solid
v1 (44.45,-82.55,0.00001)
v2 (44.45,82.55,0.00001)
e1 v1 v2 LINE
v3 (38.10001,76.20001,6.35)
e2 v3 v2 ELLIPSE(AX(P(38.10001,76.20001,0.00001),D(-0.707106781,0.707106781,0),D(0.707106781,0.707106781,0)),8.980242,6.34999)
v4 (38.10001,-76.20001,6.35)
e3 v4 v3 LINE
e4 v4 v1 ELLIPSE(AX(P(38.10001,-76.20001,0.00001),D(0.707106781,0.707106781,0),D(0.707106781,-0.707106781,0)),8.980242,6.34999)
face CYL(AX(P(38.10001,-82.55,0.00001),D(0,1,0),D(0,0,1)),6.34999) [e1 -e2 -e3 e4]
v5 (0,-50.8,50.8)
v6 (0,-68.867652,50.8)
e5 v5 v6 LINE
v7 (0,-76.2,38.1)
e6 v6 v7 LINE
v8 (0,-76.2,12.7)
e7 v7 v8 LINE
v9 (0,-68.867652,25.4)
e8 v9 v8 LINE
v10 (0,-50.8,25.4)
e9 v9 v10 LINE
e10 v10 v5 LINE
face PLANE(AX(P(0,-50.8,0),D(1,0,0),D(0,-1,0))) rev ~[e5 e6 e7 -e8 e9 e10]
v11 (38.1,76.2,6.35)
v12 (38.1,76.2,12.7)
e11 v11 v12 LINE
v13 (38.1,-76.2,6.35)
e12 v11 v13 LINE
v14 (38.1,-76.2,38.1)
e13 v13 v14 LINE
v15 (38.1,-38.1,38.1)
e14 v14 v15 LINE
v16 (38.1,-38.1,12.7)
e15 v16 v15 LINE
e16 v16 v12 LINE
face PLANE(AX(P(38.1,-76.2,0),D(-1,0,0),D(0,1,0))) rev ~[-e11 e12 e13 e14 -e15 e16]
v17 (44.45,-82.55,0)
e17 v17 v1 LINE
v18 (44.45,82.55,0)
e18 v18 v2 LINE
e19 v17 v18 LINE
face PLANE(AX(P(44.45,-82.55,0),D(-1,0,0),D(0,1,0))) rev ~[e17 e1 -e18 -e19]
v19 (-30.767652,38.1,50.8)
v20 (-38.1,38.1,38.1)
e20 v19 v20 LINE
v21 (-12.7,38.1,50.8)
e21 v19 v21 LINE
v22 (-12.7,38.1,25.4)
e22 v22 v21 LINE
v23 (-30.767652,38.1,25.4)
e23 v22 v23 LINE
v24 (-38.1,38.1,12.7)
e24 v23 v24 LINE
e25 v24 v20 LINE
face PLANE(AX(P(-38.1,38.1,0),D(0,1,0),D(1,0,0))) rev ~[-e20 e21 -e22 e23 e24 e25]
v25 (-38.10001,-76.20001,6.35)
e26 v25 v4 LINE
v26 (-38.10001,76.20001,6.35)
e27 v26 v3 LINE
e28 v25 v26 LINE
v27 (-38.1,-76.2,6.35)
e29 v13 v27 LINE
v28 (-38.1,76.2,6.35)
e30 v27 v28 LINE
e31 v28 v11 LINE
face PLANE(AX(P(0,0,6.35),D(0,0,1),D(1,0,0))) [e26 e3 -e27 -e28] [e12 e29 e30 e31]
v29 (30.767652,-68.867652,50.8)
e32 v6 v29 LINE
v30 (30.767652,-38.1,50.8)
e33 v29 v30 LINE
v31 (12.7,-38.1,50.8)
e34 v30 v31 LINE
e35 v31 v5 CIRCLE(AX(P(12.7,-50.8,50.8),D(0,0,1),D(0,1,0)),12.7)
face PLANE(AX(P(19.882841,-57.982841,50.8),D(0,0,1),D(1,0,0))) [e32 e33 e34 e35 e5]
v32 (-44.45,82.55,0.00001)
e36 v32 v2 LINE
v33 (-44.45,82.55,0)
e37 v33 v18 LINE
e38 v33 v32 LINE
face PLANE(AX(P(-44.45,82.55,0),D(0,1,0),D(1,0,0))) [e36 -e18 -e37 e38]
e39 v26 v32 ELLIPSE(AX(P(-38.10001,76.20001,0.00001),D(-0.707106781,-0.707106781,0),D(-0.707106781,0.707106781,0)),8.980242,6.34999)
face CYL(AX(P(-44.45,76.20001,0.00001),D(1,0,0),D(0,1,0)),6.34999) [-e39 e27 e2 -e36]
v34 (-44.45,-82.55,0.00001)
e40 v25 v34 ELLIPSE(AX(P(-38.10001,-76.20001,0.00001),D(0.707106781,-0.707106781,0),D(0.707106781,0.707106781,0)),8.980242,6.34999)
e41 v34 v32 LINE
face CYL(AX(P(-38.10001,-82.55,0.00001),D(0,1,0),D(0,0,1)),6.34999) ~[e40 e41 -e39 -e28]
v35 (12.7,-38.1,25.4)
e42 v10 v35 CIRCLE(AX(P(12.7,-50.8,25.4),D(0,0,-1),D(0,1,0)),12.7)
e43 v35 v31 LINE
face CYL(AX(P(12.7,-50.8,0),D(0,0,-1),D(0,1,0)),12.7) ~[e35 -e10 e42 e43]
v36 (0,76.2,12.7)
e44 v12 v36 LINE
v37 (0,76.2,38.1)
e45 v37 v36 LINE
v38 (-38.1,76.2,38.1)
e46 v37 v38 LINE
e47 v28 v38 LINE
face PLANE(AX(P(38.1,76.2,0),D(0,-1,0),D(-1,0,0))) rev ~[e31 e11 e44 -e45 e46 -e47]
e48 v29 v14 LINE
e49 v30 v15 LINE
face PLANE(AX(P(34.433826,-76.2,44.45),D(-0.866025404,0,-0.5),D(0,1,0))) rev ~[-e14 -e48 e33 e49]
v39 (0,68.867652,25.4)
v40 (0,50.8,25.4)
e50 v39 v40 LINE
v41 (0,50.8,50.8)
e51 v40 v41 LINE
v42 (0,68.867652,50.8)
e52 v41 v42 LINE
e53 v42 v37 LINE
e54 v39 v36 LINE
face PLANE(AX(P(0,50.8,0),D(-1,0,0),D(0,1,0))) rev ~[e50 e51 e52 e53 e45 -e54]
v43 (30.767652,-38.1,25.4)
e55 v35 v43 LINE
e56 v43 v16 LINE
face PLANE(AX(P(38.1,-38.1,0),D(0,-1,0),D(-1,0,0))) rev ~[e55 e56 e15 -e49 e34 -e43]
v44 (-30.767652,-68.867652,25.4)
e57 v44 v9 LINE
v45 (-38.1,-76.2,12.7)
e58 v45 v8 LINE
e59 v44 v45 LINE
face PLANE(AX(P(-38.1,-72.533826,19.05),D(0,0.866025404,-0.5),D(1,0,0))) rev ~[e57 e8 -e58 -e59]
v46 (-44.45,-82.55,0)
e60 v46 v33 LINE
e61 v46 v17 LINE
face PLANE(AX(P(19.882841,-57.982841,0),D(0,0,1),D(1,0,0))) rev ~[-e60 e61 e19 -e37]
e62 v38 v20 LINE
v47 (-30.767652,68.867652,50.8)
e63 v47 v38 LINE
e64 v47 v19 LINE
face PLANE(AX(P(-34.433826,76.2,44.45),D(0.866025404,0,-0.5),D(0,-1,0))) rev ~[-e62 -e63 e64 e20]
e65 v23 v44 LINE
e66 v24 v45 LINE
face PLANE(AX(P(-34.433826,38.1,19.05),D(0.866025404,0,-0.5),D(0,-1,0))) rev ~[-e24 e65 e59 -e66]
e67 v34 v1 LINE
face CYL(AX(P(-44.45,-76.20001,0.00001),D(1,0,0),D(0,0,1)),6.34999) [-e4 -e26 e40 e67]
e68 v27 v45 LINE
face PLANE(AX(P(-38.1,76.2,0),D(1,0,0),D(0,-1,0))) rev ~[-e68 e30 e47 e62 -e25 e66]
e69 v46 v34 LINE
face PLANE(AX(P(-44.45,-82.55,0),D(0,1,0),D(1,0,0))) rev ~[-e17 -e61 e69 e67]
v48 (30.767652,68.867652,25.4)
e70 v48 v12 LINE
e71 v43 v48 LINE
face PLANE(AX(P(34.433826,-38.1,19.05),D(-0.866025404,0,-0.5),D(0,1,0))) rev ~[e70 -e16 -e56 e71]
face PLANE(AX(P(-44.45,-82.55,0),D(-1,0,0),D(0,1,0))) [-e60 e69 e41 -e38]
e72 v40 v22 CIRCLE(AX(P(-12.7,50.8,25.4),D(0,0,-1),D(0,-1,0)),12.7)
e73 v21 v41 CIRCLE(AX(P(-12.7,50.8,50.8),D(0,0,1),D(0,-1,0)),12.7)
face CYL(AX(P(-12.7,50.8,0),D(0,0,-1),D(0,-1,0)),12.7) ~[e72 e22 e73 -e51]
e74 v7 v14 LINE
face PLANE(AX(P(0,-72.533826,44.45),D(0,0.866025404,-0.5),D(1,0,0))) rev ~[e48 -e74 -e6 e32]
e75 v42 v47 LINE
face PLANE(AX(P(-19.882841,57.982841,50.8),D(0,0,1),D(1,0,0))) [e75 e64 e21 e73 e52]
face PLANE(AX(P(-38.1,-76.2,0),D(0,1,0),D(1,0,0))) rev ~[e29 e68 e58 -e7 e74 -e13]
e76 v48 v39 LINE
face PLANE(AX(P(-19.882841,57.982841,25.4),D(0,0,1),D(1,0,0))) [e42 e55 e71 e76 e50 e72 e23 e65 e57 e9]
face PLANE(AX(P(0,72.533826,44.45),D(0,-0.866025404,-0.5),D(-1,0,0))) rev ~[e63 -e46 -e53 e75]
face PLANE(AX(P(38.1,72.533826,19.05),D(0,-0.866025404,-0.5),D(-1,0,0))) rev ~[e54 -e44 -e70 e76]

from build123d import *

# Parameters (mm, degrees)
F0_W     = 88.8999994576
F0_H     = 165.0999994576
F1_DEPTH = 6.35
F2_DEPTH = 25.4
F3_DEPTH = 50.8
F4_R     = 6.34999
F5_SIZE2 = 12.7
F5_SIZE  = 7.3323484187
F6_SIZE2 = 12.7
F6_SIZE  = 7.3323484187
F7_SIZE2 = 12.7
F7_SIZE  = 7.3323484187
F8_SIZE2 = 12.7
F8_SIZE  = 7.3323484187


# Not quite as in the source:
# - a fillet or chamfer is up to 0.001 mm smaller than in the source, because OpenCascade refuses the exact size


with BuildPart() as f1:
    # F0 (on Top) → F1 (new body)
    with BuildSketch(Plane.XY):
        with Locations((-2.712e-07, -2.712e-07)):
            Rectangle(F0_W, F0_H)
        Polygon((38.1, -38.1), (38.1, -76.2), (0, -76.2), (-38.1, -76.2), (-38.1, 38.1), (-38.1, 76.2), (0, 76.2), (38.1, 76.2), align=None, mode=Mode.SUBTRACT)
        with BuildLine():
            Line((-38.1, -76.2), (0, -76.2))
            Line((0, -76.2), (0, -50.8))
            ThreePointArc((0, -50.8), (3.7197438789, -41.8197438789), (12.7, -38.1))
            Line((12.7, -38.1), (38.1, -38.1))
            Line((38.1, -38.1), (38.1, 76.2))
            Line((38.1, 76.2), (0, 76.2))
            Line((0, 76.2), (0, 50.8))
            ThreePointArc((0, 50.8), (-3.7197438789, 41.8197438789), (-12.7, 38.1))
            Line((-12.7, 38.1), (-38.1, 38.1))
            Line((-38.1, 38.1), (-38.1, -76.2))
        make_face()
        with BuildLine():
            Line((0, -76.2), (38.1, -76.2))
            Line((38.1, -76.2), (38.1, -38.1))
            Line((38.1, -38.1), (12.7, -38.1))
            ThreePointArc((12.7, -38.1), (3.7197438789, -41.8197438789), (0, -50.8))
            Line((0, -50.8), (0, -76.2))
        make_face()
        with BuildLine():
            Line((-38.1, 76.2), (-38.1, 38.1))
            Line((-38.1, 38.1), (-12.7, 38.1))
            ThreePointArc((-12.7, 38.1), (-3.7197438789, 41.8197438789), (0, 50.8))
            Line((0, 50.8), (0, 76.2))
            Line((0, 76.2), (-38.1, 76.2))
        make_face()
    extrude(amount=F1_DEPTH)

    # F0 (on Top) → F2 (join)
    with BuildSketch(Plane.XY):
        with BuildLine():
            Line((-38.1, 76.2), (-38.1, 38.1))
            Line((-38.1, 38.1), (-12.7, 38.1))
            ThreePointArc((-12.7, 38.1), (-3.7197438789, 41.8197438789), (0, 50.8))
            Line((0, 50.8), (0, 76.2))
            Line((0, 76.2), (-38.1, 76.2))
        make_face()
        with BuildLine():
            Line((-38.1, -76.2), (0, -76.2))
            Line((0, -76.2), (0, -50.8))
            ThreePointArc((0, -50.8), (3.7197438789, -41.8197438789), (12.7, -38.1))
            Line((12.7, -38.1), (38.1, -38.1))
            Line((38.1, -38.1), (38.1, 76.2))
            Line((38.1, 76.2), (0, 76.2))
            Line((0, 76.2), (0, 50.8))
            ThreePointArc((0, 50.8), (-3.7197438789, 41.8197438789), (-12.7, 38.1))
            Line((-12.7, 38.1), (-38.1, 38.1))
            Line((-38.1, 38.1), (-38.1, -76.2))
        make_face()
        with BuildLine():
            Line((0, -76.2), (38.1, -76.2))
            Line((38.1, -76.2), (38.1, -38.1))
            Line((38.1, -38.1), (12.7, -38.1))
            ThreePointArc((12.7, -38.1), (3.7197438789, -41.8197438789), (0, -50.8))
            Line((0, -50.8), (0, -76.2))
        make_face()
    extrude(amount=F2_DEPTH)

    # F0 (on Top) → F3 (join)
    with BuildSketch(Plane.XY):
        with BuildLine():
            Line((0, -76.2), (38.1, -76.2))
            Line((38.1, -76.2), (38.1, -38.1))
            Line((38.1, -38.1), (12.7, -38.1))
            ThreePointArc((12.7, -38.1), (3.7197438789, -41.8197438789), (0, -50.8))
            Line((0, -50.8), (0, -76.2))
        make_face()
        with BuildLine():
            Line((-38.1, 76.2), (-38.1, 38.1))
            Line((-38.1, 38.1), (-12.7, 38.1))
            ThreePointArc((-12.7, 38.1), (-3.7197438789, 41.8197438789), (0, 50.8))
            Line((0, 50.8), (0, 76.2))
            Line((0, 76.2), (-38.1, 76.2))
        make_face()
    extrude(amount=F3_DEPTH)

    # F4 (radius 6.35 in the source; OpenCascade refuses exactly that, so slightly less here)
    f4_edges = [f1.edges().sort_by_distance(p)[0] for p in [
        (-44.45, 0, 6.35),
        (0, -82.55, 6.35),
        (44.449999, 0, 6.35),
        (0, 82.549999, 6.35),
    ]]
    fillet(f4_edges, radius=F4_R)

    # F5
    f5_edges = [f1.edges().sort_by_distance(p)[0] for p in [
        (-38.1, 57.15, 50.8),
        (-19.05, 76.2, 50.8),
    ]]
    f5_side = f1.faces().sort_by_distance((-19.446042, 57.546042, 50.8))[0]
    chamfer(f5_edges, length=F5_SIZE, length2=F5_SIZE2, reference=f5_side)

    # F6
    f6_edges = [f1.edges().sort_by_distance(p)[0] for p in [
        (19.05, -76.2, 50.8),
        (38.1, -57.15, 50.8),
    ]]
    f6_side = f1.faces().sort_by_distance((19.446042, -57.546042, 50.8))[0]
    chamfer(f6_edges, length=F6_SIZE, length2=F6_SIZE2, reference=f6_side)

    # F7
    f7_edges = [f1.edges().sort_by_distance(p)[0] for p in [
        (-19.05, -76.2, 25.4),
        (-38.1, -19.05, 25.4),
    ]]
    f7_side = f1.faces().sort_by_distance((0, 0, 25.4))[0]
    chamfer(f7_edges, length=F7_SIZE, length2=F7_SIZE2, reference=f7_side)

    # F8
    f8_edges = [f1.edges().sort_by_distance(p)[0] for p in [
        (38.1, 19.05, 25.4),
        (19.05, 76.2, 25.4),
    ]]
    f8_side = f1.faces().sort_by_distance((4.190317, 4.190317, 25.4))[0]
    chamfer(f8_edges, length=F8_SIZE, length2=F8_SIZE2, reference=f8_side)


solid = f1.part
